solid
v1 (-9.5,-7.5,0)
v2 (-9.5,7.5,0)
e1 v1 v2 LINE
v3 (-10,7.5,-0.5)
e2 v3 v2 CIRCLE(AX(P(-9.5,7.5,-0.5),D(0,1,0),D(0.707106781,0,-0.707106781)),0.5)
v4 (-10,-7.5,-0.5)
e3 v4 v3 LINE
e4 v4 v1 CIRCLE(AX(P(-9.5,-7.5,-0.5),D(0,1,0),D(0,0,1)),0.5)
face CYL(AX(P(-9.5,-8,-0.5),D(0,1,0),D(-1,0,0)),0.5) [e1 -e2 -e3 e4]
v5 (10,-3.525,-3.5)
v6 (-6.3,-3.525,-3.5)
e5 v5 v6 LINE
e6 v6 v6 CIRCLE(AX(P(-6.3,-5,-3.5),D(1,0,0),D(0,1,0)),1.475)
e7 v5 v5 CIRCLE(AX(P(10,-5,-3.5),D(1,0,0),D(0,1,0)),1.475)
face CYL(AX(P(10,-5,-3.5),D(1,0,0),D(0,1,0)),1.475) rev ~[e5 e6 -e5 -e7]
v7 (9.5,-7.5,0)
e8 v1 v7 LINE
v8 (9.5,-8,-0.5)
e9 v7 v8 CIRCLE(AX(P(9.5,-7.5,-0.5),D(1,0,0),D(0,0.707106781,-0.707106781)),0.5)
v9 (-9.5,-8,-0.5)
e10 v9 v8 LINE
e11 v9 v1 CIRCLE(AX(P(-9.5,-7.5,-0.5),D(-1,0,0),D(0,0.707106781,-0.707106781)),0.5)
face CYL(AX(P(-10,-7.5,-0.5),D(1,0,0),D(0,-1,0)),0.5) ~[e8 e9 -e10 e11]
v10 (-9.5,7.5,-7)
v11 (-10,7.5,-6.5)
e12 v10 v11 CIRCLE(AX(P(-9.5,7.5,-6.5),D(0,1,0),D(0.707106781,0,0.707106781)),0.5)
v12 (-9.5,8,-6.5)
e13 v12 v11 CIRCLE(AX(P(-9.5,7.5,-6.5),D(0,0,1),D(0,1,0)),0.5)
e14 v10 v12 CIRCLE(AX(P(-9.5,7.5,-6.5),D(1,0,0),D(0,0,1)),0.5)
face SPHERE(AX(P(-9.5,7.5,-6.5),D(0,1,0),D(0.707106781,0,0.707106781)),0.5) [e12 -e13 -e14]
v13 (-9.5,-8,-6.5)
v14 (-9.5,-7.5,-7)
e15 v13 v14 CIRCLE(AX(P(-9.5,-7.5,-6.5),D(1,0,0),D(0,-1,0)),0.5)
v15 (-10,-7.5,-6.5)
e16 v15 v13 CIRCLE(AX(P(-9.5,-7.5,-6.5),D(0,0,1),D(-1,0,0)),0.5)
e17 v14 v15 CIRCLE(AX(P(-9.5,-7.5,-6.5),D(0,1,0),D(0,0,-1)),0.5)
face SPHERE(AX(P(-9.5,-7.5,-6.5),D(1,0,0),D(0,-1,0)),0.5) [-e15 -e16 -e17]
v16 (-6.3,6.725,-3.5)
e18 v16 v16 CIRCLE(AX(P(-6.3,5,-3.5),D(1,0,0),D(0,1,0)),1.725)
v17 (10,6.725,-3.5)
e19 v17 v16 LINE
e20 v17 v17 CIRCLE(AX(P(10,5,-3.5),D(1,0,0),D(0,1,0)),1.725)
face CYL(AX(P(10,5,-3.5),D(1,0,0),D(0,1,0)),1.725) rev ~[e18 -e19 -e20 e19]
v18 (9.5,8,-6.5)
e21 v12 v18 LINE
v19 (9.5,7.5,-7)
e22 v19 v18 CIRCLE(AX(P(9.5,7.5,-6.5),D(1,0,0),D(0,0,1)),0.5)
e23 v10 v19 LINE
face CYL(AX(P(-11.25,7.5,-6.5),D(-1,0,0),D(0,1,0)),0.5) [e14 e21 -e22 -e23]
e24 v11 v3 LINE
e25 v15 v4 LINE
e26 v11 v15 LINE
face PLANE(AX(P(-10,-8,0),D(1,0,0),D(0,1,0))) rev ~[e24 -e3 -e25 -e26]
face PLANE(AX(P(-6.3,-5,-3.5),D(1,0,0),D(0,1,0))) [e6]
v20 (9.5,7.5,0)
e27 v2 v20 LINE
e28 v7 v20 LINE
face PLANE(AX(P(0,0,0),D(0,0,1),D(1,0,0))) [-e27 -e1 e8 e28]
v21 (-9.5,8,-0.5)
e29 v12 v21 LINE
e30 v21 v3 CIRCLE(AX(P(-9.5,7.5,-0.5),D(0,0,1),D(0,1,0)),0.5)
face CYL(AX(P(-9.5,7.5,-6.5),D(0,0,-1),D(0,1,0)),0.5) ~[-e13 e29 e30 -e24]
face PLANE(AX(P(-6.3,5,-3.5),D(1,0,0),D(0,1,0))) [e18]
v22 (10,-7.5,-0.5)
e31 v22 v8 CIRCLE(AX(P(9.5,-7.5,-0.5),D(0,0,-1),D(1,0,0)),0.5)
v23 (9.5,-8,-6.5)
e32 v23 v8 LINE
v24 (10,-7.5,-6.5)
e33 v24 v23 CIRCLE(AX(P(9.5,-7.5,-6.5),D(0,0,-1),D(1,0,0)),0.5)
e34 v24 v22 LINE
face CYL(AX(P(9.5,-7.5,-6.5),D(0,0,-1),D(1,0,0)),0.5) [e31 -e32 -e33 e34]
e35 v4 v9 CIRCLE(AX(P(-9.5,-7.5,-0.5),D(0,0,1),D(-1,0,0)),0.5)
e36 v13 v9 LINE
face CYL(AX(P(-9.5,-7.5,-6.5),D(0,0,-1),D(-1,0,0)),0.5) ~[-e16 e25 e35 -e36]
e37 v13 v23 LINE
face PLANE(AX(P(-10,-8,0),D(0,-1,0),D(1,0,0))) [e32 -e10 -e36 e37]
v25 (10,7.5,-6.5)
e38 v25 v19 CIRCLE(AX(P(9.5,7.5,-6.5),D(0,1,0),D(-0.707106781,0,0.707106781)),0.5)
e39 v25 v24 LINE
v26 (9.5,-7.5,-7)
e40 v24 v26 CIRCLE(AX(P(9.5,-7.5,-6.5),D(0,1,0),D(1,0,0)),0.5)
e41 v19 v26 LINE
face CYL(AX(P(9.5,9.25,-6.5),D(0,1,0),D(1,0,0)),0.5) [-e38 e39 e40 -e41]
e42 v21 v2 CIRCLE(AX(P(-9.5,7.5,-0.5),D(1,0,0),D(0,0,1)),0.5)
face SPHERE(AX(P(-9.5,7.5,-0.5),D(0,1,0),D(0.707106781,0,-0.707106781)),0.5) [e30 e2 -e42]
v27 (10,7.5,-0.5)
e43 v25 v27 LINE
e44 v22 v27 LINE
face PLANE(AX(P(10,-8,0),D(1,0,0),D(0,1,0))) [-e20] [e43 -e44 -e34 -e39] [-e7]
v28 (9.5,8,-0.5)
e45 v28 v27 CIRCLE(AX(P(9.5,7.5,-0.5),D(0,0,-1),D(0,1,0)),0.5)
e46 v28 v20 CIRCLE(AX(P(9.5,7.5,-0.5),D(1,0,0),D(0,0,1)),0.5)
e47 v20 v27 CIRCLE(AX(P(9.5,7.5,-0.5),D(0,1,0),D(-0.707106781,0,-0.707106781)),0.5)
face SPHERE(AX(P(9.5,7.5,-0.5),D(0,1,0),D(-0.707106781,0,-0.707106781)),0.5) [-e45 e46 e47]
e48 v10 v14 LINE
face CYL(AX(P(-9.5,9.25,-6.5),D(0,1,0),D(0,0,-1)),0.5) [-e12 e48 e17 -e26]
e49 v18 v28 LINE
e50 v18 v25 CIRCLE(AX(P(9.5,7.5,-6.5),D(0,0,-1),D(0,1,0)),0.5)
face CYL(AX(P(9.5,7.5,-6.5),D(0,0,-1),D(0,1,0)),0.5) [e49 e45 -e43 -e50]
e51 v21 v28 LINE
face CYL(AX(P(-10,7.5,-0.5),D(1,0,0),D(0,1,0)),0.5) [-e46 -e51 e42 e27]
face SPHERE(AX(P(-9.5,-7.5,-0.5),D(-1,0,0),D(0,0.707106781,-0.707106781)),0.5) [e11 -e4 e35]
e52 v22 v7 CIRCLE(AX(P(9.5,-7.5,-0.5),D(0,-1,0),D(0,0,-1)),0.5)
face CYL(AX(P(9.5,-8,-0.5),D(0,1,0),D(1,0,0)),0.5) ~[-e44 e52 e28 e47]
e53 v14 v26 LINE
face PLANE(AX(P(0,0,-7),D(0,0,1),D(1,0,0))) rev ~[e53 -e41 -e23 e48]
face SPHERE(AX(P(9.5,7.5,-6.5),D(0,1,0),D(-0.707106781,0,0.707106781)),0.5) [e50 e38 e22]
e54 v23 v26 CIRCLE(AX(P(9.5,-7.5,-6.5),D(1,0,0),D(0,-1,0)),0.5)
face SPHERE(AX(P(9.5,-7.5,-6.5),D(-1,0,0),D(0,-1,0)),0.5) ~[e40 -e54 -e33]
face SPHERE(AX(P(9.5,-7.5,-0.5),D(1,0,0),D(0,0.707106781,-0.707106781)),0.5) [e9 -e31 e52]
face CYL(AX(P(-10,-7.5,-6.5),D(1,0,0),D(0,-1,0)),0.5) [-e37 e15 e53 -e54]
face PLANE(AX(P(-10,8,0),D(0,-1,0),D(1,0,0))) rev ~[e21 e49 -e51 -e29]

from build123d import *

# Parameters (mm, degrees)
F0_W         = 20
F0_H         = 16
F1_DEPTH     = 7
F2_R         = 0.5
F3_T1_DEPTH  = 22.5
F3_T3_DEPTH  = 16.75
F3_T5_DEPTH  = 6
F3_S9_W      = 0.5
F3_S9_H      = 0.5
F3_T10_DEPTH = 0.5
F3_S15_W     = 0.5
F3_S15_H     = 0.5
F3_T16_DEPTH = 0.5
F3_T20_ANGLE = 90
F3_T22_ANGLE = 90
F4_T1_DEPTH  = 6
F4_S5_W      = 0.5
F4_S5_H      = 0.5
F4_T6_DEPTH  = 0.5
F4_S11_W     = 0.5
F4_S11_H     = 0.5
F4_T12_DEPTH = 0.5
F5_T1_DEPTH  = 6
F5_S5_W      = 0.5
F5_S5_H      = 0.5
F5_T6_DEPTH  = 0.5
F5_S11_W     = 0.5
F5_S11_H     = 0.5
F5_T12_DEPTH = 0.5
F6_R         = 1.475
F6_R_2       = 1.725
F7_DEPTH     = 16.3


# Not quite as in the source:
# - a fillet or chamfer that OpenCascade refuses, or shapes differently, is made with other operations: its cross-section is extruded or revolved along the edge and cut away or added


with BuildPart() as f1:
    # F0 (on Top) → F1 (new body)
    with BuildSketch(Plane.XY):
        Rectangle(F0_W, F0_H)
    extrude(amount=-F1_DEPTH)

    # F2
    f2_edges = [f1.edges().sort_by_distance(p)[0] for p in [
        (0, 8, 0),
        (-10, 0, 0),
        (0, -8, 0),
        (10, 0, 0),
        (0, -8, -7),
    ]]
    fillet(f2_edges, radius=F2_R)

    # F3: fillet of radius 0.5 on 4 edges, made by hand

    # F3_s2 → F3_t1 (cut)
    with BuildSketch(Plane.YZ.offset(-11.25)):
        with BuildLine():
            ThreePointArc((8, -6.5), (7.8535533906, -6.8535533906), (7.5, -7))
            Line((7.5, -7), (8, -7))
            Line((8, -7), (8, -6.5))
        make_face()
    extrude(amount=F3_T1_DEPTH, mode=Mode.SUBTRACT)

    # F3_s4 → F3_t3 (cut)
    with BuildSketch(Plane.XZ.offset(-9.25)):
        with BuildLine():
            ThreePointArc((-9.5, -7), (-9.8535533906, -6.8535533906), (-10, -6.5))
            Line((-10, -6.5), (-10, -7))
            Line((-10, -7), (-9.5, -7))
        make_face()
        with BuildLine():
            ThreePointArc((10, -6.5), (9.8535533906, -6.8535533906), (9.5, -7))
            Line((9.5, -7), (10, -7))
            Line((10, -7), (10, -6.5))
        make_face()
    extrude(amount=F3_T3_DEPTH, mode=Mode.SUBTRACT)

    # F3_s6 → F3_t5 (cut)
    with BuildSketch(Plane.XY.offset(-6.5)):
        with BuildLine():
            ThreePointArc((10, -7.5), (9.8535533906, -7.8535533906), (9.5, -8))
            Line((9.5, -8), (10, -8))
            Line((10, -8), (10, -7.5))
        make_face()
        with BuildLine():
            ThreePointArc((-10, -7.5), (-9.8535533906, -7.8535533906), (-9.5, -8))
            Line((-9.5, -8), (-10, -8))
            Line((-10, -8), (-10, -7.5))
        make_face()
    extrude(amount=F3_T5_DEPTH, mode=Mode.SUBTRACT)


with BuildPart() as f3_tool8:
    # F3_s9 → F3_t10 (new body)
    with BuildSketch(Plane.YZ.offset(9.5)):
        with Locations((-7.75, -0.25)):
            Rectangle(F3_S9_W, F3_S9_H)
    extrude(amount=F3_T10_DEPTH)

    # F3_s11 → F3_t12 (revolve, cut)
    with BuildSketch(Plane(origin=(9.5, -7.5, -0.5), x_dir=(0, 0.7071067812, -0.7071067812), z_dir=(0, -0.7071067812, -0.7071067812))):
        with BuildLine():
            ThreePointArc((0, -0.5), (0.5, 0), (0, 0.5))
            Line((0, 0.5), (0, -0.5))
        make_face()
    revolve(axis=Axis((9.5, -7.5, -0.5), (1, 0, 0)), mode=Mode.SUBTRACT)


with BuildPart() as f1_1:
    add(f1.part)

    # F3_t7: cut F3_tool8
    add(f3_tool8.part, mode=Mode.SUBTRACT)


with BuildPart() as f3_tool14:
    # F3_s15 → F3_t16 (new body)
    with BuildSketch(Plane.YZ.offset(-9.5)):
        with Locations((-7.75, -0.25)):
            Rectangle(F3_S15_W, F3_S15_H)
    extrude(amount=-F3_T16_DEPTH)

    # F3_s17 → F3_t18 (revolve, cut)
    with BuildSketch(Plane(origin=(-9.5, -7.5, -0.5), x_dir=(0, 0.7071067812, -0.7071067812), z_dir=(0, 0.7071067812, 0.7071067812))):
        with BuildLine():
            ThreePointArc((0, -0.5), (0.5, 0), (0, 0.5))
            Line((0, 0.5), (0, -0.5))
        make_face()
    revolve(axis=Axis((-9.5, -7.5, -0.5), (-1, 0, 0)), mode=Mode.SUBTRACT)


with BuildPart() as f1_2:
    add(f1_1.part)

    # F3_t13: cut F3_tool14
    add(f3_tool14.part, mode=Mode.SUBTRACT)

    # F3_s19 → F3_t20 (revolve, cut)
    with BuildSketch(Plane.XY.offset(-6.5)):
        with BuildLine():
            ThreePointArc((10, -7.5), (9.8535533906, -7.8535533906), (9.5, -8))
            Line((9.5, -8), (10, -8))
            Line((10, -8), (10, -7.5))
        make_face()
    revolve(axis=Axis((10, -7.5, -6.5), (1, 0, 0)), revolution_arc=F3_T20_ANGLE, mode=Mode.SUBTRACT)

    # F3_s21 → F3_t22 (revolve, cut)
    with BuildSketch(Plane.XY.offset(-6.5)):
        with BuildLine():
            ThreePointArc((-10, -7.5), (-9.8535533906, -7.8535533906), (-9.5, -8))
            Line((-9.5, -8), (-10, -8))
            Line((-10, -8), (-10, -7.5))
        make_face()
    revolve(axis=Axis((-10, -7.5, -6.5), (1, 0, 0)), revolution_arc=F3_T22_ANGLE, mode=Mode.SUBTRACT)

    # F4: fillet of radius 0.5 on 1 edges, made by hand

    # F4_s2 → F4_t1 (cut)
    with BuildSketch(Plane.XY.offset(-6.5)):
        with BuildLine():
            ThreePointArc((-9.5, 8), (-9.8535533906, 7.8535533906), (-10, 7.5))
            Line((-10, 7.5), (-10, 8))
            Line((-10, 8), (-9.5, 8))
        make_face()
    extrude(amount=F4_T1_DEPTH, mode=Mode.SUBTRACT)


with BuildPart() as f4_tool4:
    # F4_s5 → F4_t6 (new body)
    with BuildSketch(Plane.XZ.offset(-7.5)):
        with Locations((-9.75, -0.25)):
            Rectangle(F4_S5_W, F4_S5_H)
    extrude(amount=-F4_T6_DEPTH)

    # F4_s7 → F4_t8 (revolve, cut)
    with BuildSketch(Plane(origin=(-9.5, 7.5, -0.5), x_dir=(0.7071067812, 0, -0.7071067812), z_dir=(0.7071067812, 0, 0.7071067812))):
        with BuildLine():
            ThreePointArc((0, -0.5), (0.5, 0), (0, 0.5))
            Line((0, 0.5), (0, -0.5))
        make_face()
    revolve(axis=Axis((-9.5, 7.5, -0.5), (0, 1, 0)), mode=Mode.SUBTRACT)


with BuildPart() as f1_3:
    add(f1_2.part)

    # F4_t3: cut F4_tool4
    add(f4_tool4.part, mode=Mode.SUBTRACT)


with BuildPart() as f4_tool10:
    # F4_s11 → F4_t12 (new body)
    with BuildSketch(Plane.XZ.offset(-7.5)):
        with Locations((-9.75, -6.75)):
            Rectangle(F4_S11_W, F4_S11_H)
    extrude(amount=-F4_T12_DEPTH)

    # F4_s13 → F4_t14 (revolve, cut)
    with BuildSketch(Plane(origin=(-9.5, 7.5, -6.5), x_dir=(0.7071067812, 0, 0.7071067812), z_dir=(-0.7071067812, 0, 0.7071067812))):
        with BuildLine():
            ThreePointArc((0, -0.5), (0.5, 0), (0, 0.5))
            Line((0, 0.5), (0, -0.5))
        make_face()
    revolve(axis=Axis((-9.5, 7.5, -6.5), (0, 1, 0)), mode=Mode.SUBTRACT)


with BuildPart() as f1_4:
    add(f1_3.part)

    # F4_t9: cut F4_tool10
    add(f4_tool10.part, mode=Mode.SUBTRACT)

    # F5: fillet of radius 0.5 on 1 edges, made by hand

    # F5_s2 → F5_t1 (cut)
    with BuildSketch(Plane.XY.offset(-6.5)):
        with BuildLine():
            ThreePointArc((9.5, 8), (9.8535533906, 7.8535533906), (10, 7.5))
            Line((10, 7.5), (10, 8))
            Line((10, 8), (9.5, 8))
        make_face()
    extrude(amount=F5_T1_DEPTH, mode=Mode.SUBTRACT)


with BuildPart() as f5_tool4:
    # F5_s5 → F5_t6 (new body)
    with BuildSketch(Plane.XZ.offset(-7.5)):
        with Locations((9.75, -0.25)):
            Rectangle(F5_S5_W, F5_S5_H)
    extrude(amount=-F5_T6_DEPTH)

    # F5_s7 → F5_t8 (revolve, cut)
    with BuildSketch(Plane(origin=(9.5, 7.5, -0.5), x_dir=(-0.7071067812, 0, -0.7071067812), z_dir=(0.7071067812, 0, -0.7071067812))):
        with BuildLine():
            ThreePointArc((0, -0.5), (0.5, 0), (0, 0.5))
            Line((0, 0.5), (0, -0.5))
        make_face()
    revolve(axis=Axis((9.5, 7.5, -0.5), (0, 1, 0)), mode=Mode.SUBTRACT)


with BuildPart() as f1_5:
    add(f1_4.part)

    # F5_t3: cut F5_tool4
    add(f5_tool4.part, mode=Mode.SUBTRACT)


with BuildPart() as f5_tool10:
    # F5_s11 → F5_t12 (new body)
    with BuildSketch(Plane.XZ.offset(-7.5)):
        with Locations((9.75, -6.75)):
            Rectangle(F5_S11_W, F5_S11_H)
    extrude(amount=-F5_T12_DEPTH)

    # F5_s13 → F5_t14 (revolve, cut)
    with BuildSketch(Plane(origin=(9.5, 7.5, -6.5), x_dir=(-0.7071067812, 0, 0.7071067812), z_dir=(-0.7071067812, 0, -0.7071067812))):
        with BuildLine():
            ThreePointArc((0, -0.5), (0.5, 0), (0, 0.5))
            Line((0, 0.5), (0, -0.5))
        make_face()
    revolve(axis=Axis((9.5, 7.5, -6.5), (0, 1, 0)), mode=Mode.SUBTRACT)


with BuildPart() as f1_6:
    add(f1_5.part)

    # F5_t9: cut F5_tool10
    add(f5_tool10.part, mode=Mode.SUBTRACT)

    # F6 (on face) → F7 (cut)
    with BuildSketch(Plane.YZ.offset(10)):
        with Locations((-5, -3.5)):
            Circle(F6_R)
        with Locations((5, -3.5)):
            Circle(F6_R_2)
    extrude(amount=-F7_DEPTH, mode=Mode.SUBTRACT)


solid = f1_6.part
